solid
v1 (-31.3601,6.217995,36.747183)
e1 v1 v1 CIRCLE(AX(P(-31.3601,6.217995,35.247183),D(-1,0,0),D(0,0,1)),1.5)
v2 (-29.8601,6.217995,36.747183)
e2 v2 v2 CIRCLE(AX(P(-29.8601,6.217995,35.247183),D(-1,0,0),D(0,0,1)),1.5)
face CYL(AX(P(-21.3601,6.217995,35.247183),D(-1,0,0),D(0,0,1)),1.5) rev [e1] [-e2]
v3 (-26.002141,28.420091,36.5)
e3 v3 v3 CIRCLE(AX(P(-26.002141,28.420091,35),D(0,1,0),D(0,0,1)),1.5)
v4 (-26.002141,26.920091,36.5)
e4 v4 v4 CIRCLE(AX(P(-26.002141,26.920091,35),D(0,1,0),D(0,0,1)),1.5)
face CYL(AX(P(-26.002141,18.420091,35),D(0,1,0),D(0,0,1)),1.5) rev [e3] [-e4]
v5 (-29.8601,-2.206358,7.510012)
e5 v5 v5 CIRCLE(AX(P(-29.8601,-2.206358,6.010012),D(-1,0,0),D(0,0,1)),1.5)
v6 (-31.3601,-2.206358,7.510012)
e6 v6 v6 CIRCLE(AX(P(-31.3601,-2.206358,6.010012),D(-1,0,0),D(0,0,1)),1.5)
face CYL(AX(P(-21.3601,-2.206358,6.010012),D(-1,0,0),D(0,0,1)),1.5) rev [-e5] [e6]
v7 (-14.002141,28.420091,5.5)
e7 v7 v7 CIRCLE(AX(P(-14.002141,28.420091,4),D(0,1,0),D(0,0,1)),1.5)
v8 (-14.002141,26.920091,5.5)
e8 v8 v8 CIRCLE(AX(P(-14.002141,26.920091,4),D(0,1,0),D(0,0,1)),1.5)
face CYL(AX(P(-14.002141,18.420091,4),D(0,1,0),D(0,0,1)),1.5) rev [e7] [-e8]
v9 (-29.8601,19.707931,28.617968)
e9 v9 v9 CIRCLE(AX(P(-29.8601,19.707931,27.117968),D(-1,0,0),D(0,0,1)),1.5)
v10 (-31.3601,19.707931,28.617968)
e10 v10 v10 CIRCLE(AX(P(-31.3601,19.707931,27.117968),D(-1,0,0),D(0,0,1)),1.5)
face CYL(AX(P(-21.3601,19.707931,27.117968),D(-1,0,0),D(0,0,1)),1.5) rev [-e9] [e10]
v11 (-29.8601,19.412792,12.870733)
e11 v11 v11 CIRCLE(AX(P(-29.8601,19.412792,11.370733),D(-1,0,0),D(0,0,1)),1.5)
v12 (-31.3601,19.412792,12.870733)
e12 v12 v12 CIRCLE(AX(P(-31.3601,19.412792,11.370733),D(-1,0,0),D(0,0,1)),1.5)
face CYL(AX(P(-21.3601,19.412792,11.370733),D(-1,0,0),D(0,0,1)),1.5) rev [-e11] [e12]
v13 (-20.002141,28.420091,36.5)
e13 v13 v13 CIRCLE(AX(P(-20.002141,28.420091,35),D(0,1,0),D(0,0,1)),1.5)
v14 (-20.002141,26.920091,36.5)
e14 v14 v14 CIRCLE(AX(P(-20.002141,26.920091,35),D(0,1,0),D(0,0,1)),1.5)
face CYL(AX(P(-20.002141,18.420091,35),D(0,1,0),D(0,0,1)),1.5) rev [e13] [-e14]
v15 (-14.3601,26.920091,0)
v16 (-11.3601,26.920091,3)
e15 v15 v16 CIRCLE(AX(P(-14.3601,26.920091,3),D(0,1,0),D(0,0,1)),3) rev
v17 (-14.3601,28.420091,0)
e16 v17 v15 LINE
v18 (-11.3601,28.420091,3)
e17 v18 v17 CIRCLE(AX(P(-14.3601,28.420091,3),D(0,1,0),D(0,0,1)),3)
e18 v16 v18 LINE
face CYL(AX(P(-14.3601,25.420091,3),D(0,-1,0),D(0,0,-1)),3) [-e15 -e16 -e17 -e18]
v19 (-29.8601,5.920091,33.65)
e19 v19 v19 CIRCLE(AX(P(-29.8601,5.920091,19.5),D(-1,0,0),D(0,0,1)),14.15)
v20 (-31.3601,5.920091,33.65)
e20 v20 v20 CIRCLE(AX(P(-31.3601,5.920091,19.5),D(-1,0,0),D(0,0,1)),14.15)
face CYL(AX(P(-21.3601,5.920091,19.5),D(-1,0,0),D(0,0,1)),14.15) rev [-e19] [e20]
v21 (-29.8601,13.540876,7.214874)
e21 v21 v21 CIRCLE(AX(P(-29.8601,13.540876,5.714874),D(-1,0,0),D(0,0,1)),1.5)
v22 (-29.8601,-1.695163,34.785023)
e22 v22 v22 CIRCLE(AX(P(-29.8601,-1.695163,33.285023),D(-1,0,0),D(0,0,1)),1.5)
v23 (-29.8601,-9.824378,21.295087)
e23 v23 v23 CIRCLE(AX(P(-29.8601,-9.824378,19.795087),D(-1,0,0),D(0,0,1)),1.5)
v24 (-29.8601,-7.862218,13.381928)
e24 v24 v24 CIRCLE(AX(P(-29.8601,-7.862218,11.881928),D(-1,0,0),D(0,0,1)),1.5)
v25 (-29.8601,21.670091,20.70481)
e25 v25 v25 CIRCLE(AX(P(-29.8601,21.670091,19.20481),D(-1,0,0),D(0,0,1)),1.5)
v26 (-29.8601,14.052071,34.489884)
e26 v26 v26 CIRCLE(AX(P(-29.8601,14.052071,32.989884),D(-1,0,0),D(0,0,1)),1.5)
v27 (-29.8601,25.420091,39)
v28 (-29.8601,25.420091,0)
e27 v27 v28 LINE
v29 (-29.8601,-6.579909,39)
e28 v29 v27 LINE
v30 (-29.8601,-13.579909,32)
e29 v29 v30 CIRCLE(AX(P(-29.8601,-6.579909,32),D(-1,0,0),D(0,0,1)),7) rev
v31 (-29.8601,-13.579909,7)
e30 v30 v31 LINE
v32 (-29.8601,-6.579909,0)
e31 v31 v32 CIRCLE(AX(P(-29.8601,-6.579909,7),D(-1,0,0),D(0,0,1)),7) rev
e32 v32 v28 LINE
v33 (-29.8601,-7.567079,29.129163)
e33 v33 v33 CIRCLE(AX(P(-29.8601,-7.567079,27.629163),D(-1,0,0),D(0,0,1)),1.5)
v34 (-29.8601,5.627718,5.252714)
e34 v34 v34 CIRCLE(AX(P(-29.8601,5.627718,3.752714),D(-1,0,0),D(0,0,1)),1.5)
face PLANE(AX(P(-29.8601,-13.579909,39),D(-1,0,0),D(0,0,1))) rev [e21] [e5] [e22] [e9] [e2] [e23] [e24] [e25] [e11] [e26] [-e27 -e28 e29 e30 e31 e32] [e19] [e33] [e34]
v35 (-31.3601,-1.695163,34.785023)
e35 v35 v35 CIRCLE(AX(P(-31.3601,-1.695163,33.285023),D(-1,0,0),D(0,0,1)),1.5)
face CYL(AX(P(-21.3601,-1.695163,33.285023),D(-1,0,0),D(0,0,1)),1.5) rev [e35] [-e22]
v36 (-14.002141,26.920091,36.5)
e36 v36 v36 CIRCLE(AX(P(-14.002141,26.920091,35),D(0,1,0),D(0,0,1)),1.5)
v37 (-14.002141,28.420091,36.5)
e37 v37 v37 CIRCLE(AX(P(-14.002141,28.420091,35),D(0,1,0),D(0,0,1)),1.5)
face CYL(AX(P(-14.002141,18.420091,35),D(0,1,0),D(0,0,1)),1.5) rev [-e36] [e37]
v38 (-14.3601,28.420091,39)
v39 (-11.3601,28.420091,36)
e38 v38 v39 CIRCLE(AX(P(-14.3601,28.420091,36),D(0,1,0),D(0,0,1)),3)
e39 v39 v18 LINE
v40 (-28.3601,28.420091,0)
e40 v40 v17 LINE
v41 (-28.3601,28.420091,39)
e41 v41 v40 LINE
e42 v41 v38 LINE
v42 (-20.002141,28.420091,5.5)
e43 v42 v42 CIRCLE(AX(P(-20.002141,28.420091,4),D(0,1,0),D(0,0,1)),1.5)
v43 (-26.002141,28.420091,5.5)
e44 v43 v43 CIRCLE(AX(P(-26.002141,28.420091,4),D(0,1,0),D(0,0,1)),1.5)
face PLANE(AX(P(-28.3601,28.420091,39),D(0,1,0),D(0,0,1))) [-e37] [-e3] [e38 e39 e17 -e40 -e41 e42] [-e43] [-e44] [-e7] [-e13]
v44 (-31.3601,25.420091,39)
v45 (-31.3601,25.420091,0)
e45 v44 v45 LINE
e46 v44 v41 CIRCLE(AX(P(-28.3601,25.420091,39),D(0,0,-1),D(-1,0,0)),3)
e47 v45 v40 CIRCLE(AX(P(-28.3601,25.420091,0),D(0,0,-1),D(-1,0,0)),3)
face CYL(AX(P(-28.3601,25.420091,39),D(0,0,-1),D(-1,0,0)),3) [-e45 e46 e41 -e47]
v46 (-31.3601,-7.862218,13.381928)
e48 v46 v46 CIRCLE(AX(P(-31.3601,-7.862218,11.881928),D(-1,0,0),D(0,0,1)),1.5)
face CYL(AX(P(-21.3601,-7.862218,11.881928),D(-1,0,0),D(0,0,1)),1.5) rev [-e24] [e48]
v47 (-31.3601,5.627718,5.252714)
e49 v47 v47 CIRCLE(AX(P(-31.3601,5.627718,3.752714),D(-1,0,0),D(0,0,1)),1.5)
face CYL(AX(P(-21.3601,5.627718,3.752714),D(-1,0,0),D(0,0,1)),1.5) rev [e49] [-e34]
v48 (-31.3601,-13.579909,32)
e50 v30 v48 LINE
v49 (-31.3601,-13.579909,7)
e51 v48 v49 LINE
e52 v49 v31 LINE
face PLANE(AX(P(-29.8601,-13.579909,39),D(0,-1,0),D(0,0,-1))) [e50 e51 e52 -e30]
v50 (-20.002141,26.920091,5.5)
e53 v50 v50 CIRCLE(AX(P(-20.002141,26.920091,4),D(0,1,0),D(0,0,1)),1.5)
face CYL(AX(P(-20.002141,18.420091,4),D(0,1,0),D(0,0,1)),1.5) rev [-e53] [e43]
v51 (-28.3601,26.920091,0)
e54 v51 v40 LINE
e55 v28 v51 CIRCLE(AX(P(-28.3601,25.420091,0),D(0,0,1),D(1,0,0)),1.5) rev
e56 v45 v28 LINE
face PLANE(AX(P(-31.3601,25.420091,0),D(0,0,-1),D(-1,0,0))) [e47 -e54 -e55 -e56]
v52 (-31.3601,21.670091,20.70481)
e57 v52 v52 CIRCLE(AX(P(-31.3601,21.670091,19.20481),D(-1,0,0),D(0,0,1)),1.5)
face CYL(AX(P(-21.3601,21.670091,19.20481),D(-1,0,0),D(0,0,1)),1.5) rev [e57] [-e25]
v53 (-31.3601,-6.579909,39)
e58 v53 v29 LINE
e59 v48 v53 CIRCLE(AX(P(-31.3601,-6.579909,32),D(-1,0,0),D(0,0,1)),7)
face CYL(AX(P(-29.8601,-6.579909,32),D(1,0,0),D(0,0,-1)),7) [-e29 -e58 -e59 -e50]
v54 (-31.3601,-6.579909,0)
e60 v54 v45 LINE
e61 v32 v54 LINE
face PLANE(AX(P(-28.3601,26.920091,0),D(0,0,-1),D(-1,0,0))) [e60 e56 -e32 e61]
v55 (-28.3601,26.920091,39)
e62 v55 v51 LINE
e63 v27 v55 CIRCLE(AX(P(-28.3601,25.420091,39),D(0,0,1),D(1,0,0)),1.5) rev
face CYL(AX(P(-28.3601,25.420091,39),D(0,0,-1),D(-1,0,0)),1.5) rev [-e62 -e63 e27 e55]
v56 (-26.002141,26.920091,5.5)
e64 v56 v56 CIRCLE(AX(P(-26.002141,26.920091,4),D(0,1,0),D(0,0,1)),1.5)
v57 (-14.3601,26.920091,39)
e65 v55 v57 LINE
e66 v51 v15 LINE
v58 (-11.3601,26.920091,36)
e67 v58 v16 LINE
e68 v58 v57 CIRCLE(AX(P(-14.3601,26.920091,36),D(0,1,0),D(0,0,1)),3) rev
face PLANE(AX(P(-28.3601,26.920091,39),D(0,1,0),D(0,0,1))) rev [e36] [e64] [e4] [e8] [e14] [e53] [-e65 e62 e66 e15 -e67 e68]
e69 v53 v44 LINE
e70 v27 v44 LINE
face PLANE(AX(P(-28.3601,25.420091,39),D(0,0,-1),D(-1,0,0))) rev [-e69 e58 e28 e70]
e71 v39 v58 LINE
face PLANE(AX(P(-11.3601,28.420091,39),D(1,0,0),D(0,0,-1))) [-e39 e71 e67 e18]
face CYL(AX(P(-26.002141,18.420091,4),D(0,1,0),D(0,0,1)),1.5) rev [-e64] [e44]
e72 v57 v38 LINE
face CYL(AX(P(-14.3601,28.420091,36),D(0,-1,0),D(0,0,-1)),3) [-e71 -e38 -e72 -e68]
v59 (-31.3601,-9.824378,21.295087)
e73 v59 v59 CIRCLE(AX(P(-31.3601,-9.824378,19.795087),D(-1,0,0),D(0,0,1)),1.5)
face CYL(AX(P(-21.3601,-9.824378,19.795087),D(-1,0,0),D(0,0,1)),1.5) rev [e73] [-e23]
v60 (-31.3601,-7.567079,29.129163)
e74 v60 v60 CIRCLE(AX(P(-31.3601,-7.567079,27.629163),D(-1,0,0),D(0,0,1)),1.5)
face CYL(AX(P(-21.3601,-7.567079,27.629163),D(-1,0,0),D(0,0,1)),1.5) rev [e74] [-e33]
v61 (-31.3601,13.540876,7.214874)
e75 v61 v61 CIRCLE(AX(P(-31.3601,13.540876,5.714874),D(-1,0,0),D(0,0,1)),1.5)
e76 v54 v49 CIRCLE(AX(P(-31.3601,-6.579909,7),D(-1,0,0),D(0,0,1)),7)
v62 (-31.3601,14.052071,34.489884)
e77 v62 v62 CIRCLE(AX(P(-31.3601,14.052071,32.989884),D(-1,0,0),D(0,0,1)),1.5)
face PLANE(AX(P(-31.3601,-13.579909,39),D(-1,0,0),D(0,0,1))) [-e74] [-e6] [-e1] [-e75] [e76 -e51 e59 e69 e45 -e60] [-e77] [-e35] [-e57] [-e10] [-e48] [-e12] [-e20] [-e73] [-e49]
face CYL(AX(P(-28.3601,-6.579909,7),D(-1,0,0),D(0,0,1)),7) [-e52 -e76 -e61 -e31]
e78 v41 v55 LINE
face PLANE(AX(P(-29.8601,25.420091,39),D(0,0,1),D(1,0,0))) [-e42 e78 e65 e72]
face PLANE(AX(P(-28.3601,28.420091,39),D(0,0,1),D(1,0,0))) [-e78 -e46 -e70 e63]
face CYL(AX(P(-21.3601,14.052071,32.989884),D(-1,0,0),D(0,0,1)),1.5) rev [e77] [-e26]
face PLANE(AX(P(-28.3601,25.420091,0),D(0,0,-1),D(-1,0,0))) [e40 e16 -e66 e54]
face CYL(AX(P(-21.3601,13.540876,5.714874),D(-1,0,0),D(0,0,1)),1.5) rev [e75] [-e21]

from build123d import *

# Parameters (mm, degrees)
BASE_FLANGE1_DEPTH = 39
FILLET1_R          = 7
FILLET2_R          = 3
SKETCH6_R          = 14.15
CUT_EXTRUDE1_DEPTH = 10
SKETCH12_R         = 1.5
CUT_EXTRUDE2_DEPTH = 10
SKETCH13_R         = 1.5
CUT_EXTRUDE3_DEPTH = 10


# Sheet-metal steps are written as plain solids
with BuildPart() as part:
    # Sketch1 → Base-Flange1 (new body)
    with BuildSketch(Plane.XY):
        with BuildLine():
            Line((-31.36010038, -13.579909031), (-31.36010038, 25.420090969))
            ThreePointArc((-31.36010038, 25.420090969), (-30.481420723, 27.541411313), (-28.36010038, 28.420090969))
            Line((-28.36010038, 28.420090969), (-11.36010038, 28.420090969))
            Line((-11.36010038, 28.420090969), (-11.36010038, 26.920090969))
            Line((-11.36010038, 26.920090969), (-28.36010038, 26.920090969))
            ThreePointArc((-28.36010038, 26.920090969), (-29.420760552, 26.480751141), (-29.86010038, 25.420090969))
            Line((-29.86010038, 25.420090969), (-29.86010038, -13.579909031))
            Line((-29.86010038, -13.579909031), (-31.36010038, -13.579909031))
        make_face()
    extrude(amount=BASE_FLANGE1_DEPTH)

    # Fillet1
    fillet1_edges = [part.edges().sort_by_distance(p)[0] for p in [
        (-30.61010038, -13.579909031, 39),
        (-30.61010038, -13.579909031, 0),
    ]]
    fillet(fillet1_edges, radius=FILLET1_R)

    # Fillet2
    fillet2_edges = [part.edges().sort_by_distance(p)[0] for p in [
        (-11.36010038, 27.670090969, 39),
        (-11.36010038, 27.670090969, 0),
    ]]
    fillet(fillet2_edges, radius=FILLET2_R)

    # Sketch6 → Cut-Extrude1 (cut)
    with BuildSketch(Plane.ZY.offset(31.36010038)):
        with Locations((19.5, 5.920090969)):
            Circle(SKETCH6_R)
    extrude(amount=-CUT_EXTRUDE1_DEPTH, mode=Mode.SUBTRACT)

    # Sketch12 → Cut-Extrude2 (cut)
    with BuildSketch(Plane.ZY.offset(31.36010038)):
        with Locations((19.204809579, 21.670090969)):
            Circle(SKETCH12_R)
        with Locations((27.117967884, 19.707930885)):
            Circle(SKETCH12_R)
        with Locations((32.989883957, 14.052071253)):
            Circle(SKETCH12_R)
        with Locations((35.24718263, 6.217995095)):
            Circle(SKETCH12_R)
        with Locations((33.285022545, -1.695163209)):
            Circle(SKETCH12_R)
        with Locations((27.629162914, -7.567079283)):
            Circle(SKETCH12_R)
        with Locations((19.795086756, -9.824377956)):
            Circle(SKETCH12_R)
        with Locations((11.881928451, -7.862217871)):
            Circle(SKETCH12_R)
        with Locations((6.010012378, -2.206358239)):
            Circle(SKETCH12_R)
        with Locations((3.752713705, 5.627717919)):
            Circle(SKETCH12_R)
        with Locations((5.71487379, 13.540876223)):
            Circle(SKETCH12_R)
        with Locations((11.370733421, 19.412792296)):
            Circle(SKETCH12_R)
    extrude(amount=-CUT_EXTRUDE2_DEPTH, mode=Mode.SUBTRACT)

    # Sketch13 → Cut-Extrude3 (cut)
    with BuildSketch(Plane(origin=(0, 28.420090969, 0), x_dir=(1, 0, 0), z_dir=(0, 1, 0))):
        with Locations(Location((-26.002140867, -4, 0), (0, 0, 270))):
            Circle(SKETCH13_R)
        with Locations(Location((-20.002140867, -4, 0), (0, 0, 270))):
            Circle(SKETCH13_R)
        with Locations(Location((-14.002140867, -4, 0), (0, 0, 270))):
            Circle(SKETCH13_R)
        with Locations(Location((-20.002140867, -35, 0), (0, 0, 270))):
            Circle(SKETCH13_R)
        with Locations(Location((-14.002140867, -35, 0), (0, 0, 270))):
            Circle(SKETCH13_R)
        with Locations(Location((-26.002140867, -35, 0), (0, 0, 270))):
            Circle(SKETCH13_R)
    extrude(amount=-CUT_EXTRUDE3_DEPTH, mode=Mode.SUBTRACT)


solid = part.part
